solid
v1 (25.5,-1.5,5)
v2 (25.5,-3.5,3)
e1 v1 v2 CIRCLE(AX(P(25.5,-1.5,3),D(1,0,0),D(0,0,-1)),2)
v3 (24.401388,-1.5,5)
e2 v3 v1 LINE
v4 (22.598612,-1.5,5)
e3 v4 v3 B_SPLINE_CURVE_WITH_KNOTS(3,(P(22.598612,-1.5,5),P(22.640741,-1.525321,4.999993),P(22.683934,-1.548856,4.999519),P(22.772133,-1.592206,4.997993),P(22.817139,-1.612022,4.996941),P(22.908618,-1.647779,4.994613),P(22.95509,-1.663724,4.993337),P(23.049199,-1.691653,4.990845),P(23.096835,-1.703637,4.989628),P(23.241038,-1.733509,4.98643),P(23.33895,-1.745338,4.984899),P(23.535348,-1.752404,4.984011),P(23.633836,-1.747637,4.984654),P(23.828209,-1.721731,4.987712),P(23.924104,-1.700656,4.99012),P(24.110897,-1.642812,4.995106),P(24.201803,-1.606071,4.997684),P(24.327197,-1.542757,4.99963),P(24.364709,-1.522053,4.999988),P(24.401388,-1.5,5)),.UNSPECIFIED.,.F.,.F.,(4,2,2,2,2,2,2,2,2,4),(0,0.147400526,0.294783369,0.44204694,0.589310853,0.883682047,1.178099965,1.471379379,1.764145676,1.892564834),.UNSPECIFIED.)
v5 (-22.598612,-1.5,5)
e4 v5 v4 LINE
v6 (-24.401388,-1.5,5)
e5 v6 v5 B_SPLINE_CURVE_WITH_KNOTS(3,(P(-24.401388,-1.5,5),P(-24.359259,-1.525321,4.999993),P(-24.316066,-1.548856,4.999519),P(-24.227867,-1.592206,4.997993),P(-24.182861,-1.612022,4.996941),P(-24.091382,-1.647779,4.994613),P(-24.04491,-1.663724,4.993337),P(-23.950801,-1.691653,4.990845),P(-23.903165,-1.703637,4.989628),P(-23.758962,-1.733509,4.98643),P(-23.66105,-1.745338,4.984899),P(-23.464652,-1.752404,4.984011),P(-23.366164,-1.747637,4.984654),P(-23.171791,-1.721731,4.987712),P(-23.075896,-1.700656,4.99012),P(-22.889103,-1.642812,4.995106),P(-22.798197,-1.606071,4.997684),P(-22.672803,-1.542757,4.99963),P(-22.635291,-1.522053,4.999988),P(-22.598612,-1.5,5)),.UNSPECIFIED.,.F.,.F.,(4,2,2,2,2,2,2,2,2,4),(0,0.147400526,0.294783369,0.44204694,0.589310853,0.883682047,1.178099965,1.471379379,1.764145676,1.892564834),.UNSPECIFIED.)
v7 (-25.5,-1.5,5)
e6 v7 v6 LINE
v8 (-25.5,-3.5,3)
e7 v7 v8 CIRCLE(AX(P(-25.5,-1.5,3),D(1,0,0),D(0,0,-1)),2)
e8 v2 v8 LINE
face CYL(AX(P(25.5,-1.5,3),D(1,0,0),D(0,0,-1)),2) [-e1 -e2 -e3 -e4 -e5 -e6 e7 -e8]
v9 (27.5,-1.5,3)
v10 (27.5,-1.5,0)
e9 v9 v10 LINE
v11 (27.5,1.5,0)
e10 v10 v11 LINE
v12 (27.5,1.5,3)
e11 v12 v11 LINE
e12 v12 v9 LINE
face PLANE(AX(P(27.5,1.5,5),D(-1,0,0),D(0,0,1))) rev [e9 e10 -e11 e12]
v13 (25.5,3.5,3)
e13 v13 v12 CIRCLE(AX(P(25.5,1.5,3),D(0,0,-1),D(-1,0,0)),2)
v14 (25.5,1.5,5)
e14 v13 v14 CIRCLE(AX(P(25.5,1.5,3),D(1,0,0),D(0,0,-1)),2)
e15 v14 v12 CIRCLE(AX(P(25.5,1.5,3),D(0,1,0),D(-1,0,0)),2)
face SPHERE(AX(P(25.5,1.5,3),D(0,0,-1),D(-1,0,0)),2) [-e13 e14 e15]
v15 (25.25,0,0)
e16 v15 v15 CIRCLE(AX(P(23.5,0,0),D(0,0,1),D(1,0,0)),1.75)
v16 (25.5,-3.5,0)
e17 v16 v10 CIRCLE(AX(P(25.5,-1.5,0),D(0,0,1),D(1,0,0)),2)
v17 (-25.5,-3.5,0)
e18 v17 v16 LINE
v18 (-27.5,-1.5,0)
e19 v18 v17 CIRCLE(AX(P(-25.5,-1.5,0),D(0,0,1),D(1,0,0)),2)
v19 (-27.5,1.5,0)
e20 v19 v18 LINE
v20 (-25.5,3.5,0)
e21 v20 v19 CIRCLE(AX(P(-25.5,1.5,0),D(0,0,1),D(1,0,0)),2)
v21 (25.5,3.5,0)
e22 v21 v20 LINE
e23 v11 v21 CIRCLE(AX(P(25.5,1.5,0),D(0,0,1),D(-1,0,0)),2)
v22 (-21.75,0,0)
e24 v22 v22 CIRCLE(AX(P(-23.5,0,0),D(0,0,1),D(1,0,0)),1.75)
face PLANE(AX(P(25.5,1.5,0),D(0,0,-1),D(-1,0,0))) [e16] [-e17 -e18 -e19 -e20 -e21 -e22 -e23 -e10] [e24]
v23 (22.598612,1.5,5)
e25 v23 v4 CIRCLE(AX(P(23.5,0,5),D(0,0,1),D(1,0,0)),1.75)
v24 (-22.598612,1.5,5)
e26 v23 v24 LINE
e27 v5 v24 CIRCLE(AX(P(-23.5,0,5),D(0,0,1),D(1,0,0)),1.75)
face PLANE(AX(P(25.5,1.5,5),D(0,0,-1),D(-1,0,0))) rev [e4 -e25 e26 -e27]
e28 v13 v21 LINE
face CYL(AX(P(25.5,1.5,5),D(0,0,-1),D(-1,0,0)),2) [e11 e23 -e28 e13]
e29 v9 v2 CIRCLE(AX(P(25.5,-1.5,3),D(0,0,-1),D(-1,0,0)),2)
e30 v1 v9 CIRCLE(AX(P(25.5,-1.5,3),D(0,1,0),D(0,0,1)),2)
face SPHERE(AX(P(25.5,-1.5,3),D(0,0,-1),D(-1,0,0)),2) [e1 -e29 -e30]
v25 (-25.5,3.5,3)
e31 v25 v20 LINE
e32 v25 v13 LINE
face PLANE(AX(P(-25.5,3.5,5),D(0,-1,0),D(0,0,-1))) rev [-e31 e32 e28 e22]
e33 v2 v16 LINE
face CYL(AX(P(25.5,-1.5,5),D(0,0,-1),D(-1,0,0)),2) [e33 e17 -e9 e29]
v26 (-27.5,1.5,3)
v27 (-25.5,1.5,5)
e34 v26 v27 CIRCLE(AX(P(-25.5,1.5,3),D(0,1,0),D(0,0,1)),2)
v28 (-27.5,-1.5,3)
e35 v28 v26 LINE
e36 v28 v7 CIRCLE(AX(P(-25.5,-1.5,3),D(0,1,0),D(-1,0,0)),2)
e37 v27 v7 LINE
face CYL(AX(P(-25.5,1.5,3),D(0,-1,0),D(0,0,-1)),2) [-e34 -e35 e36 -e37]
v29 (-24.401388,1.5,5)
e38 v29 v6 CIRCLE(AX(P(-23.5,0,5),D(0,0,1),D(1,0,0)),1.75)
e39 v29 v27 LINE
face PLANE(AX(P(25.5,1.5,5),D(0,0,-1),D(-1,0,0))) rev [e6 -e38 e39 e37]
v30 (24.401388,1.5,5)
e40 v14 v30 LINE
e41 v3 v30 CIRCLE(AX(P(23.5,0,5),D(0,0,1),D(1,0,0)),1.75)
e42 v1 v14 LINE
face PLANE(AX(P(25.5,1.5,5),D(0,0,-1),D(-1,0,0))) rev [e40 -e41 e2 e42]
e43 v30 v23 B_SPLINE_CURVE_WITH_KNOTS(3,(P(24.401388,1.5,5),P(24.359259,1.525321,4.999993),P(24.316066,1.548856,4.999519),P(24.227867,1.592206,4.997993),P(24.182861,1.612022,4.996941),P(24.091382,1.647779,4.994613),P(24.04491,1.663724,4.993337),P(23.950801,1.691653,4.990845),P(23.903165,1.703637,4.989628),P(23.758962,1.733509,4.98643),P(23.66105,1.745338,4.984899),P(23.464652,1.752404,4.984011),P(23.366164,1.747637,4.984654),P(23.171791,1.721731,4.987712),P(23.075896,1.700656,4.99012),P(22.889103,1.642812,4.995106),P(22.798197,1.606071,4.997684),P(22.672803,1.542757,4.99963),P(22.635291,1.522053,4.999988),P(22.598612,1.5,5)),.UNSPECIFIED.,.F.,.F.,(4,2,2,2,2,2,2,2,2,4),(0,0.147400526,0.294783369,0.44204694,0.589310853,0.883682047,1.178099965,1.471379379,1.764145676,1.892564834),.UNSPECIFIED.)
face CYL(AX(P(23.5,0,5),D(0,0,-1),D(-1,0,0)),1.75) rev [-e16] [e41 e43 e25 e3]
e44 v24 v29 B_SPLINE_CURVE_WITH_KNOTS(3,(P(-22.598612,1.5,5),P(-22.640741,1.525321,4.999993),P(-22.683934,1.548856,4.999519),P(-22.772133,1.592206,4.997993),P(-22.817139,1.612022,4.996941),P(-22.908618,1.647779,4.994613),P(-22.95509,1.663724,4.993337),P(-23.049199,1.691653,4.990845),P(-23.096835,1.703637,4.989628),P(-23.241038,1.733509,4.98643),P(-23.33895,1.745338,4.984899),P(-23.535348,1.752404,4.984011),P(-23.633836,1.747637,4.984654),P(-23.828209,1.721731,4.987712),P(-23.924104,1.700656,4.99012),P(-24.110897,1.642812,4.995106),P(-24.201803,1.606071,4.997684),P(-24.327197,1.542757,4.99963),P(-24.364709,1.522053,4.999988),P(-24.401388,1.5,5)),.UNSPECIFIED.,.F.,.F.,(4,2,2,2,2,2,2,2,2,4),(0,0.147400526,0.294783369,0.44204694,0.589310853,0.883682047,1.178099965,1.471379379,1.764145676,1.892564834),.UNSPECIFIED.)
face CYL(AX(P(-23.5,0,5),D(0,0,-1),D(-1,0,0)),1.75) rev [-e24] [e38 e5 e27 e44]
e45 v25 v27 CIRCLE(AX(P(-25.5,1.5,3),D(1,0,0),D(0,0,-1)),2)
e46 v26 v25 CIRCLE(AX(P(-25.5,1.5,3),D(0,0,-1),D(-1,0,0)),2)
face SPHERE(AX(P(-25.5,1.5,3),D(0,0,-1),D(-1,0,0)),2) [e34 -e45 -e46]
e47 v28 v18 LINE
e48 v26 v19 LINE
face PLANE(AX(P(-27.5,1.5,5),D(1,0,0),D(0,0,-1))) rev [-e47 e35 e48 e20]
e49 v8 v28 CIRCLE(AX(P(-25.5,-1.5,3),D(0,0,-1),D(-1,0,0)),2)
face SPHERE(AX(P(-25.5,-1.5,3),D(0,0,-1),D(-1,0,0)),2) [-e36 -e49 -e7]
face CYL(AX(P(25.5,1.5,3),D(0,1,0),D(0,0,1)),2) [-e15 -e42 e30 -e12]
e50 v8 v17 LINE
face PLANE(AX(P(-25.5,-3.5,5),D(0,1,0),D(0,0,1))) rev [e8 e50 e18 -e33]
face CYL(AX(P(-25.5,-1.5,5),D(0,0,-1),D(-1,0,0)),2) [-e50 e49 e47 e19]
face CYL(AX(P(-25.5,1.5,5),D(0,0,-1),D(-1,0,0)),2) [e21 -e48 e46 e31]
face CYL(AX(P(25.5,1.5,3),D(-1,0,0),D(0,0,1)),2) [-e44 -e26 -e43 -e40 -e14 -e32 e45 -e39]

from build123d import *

# Parameters (mm, degrees)
SKETCH1_R           = 1.75
BOSS_EXTRUDE1_DEPTH = 5
FILLET1_R           = 2


with BuildPart() as part:
    # Sketch1 → Boss-Extrude1 (new body)
    with BuildSketch(Plane.XY):
        with BuildLine():
            Line((-25.5, 3.5), (25.5, 3.5))
            ThreePointArc((25.5, 3.5), (26.914213562, 2.914213562), (27.5, 1.5))
            Line((27.5, 1.5), (27.5, -1.5))
            ThreePointArc((27.5, -1.5), (26.914213562, -2.914213562), (25.5, -3.5))
            Line((25.5, -3.5), (-25.5, -3.5))
            ThreePointArc((-25.5, -3.5), (-26.914213562, -2.914213562), (-27.5, -1.5))
            Line((-27.5, -1.5), (-27.5, 1.5))
            ThreePointArc((-27.5, 1.5), (-26.914213562, 2.914213562), (-25.5, 3.5))
        make_face()
        with Locations((-23.5, 0)):
            Circle(SKETCH1_R, mode=Mode.SUBTRACT)
        with Locations((23.5, 0)):
            Circle(SKETCH1_R, mode=Mode.SUBTRACT)
    extrude(amount=BOSS_EXTRUDE1_DEPTH)

    # Fillet1
    # the kernel refuses this fillet: 2 mm, written as the material it takes off along each edge
    with BuildSketch(Plane(origin=(-25.5, 1.5, 5), x_dir=(-1, 0, 0), z_dir=(0, -1, 0))) as fillet1_piece_1:
        with BuildLine():
            CenterArc((2 - FILLET1_R, FILLET1_R), FILLET1_R, 270, 90)
            Line((2 - FILLET1_R, 0), (2, 0))
            Line((2, 0), (2, FILLET1_R))
        make_face()
    revolve(axis=Axis((-25.5, 1.5, 5), (0, 0, -1)), revolution_arc=90, mode=Mode.SUBTRACT)
    with BuildSketch(Plane(origin=(-27.5, -1.5, 5), x_dir=(0, 0, -1), z_dir=(0, 1, 0)), Plane(origin=(27.5, 1.5, 5), x_dir=(0, 0, -1), z_dir=(0, -1, 0))) as fillet1_piece_2:
        with BuildLine():
            CenterArc((FILLET1_R, -FILLET1_R), FILLET1_R, 90, 90)
            Line((0, -FILLET1_R), (0, 0))
            Line((0, 0), (FILLET1_R, 0))
        make_face()
    extrude(amount=3, mode=Mode.SUBTRACT)
    with BuildSketch(Plane(origin=(-25.5, -1.5, 5), x_dir=(0, -1, 0), z_dir=(1, 0, 0))) as fillet1_piece_3:
        with BuildLine():
            CenterArc((2 - FILLET1_R, FILLET1_R), FILLET1_R, 270, 90)
            Line((2 - FILLET1_R, 0), (2, 0))
            Line((2, 0), (2, FILLET1_R))
        make_face()
    revolve(axis=Axis((-25.5, -1.5, 5), (0, 0, -1)), revolution_arc=90, mode=Mode.SUBTRACT)
    with BuildSketch(Plane(origin=(25.5, -3.5, 5), x_dir=(0, 0, -1), z_dir=(-1, 0, 0)), Plane(origin=(-25.5, 3.5, 5), x_dir=(0, 0, -1), z_dir=(1, 0, 0))) as fillet1_piece_4:
        with BuildLine():
            CenterArc((FILLET1_R, -FILLET1_R), FILLET1_R, 90, 90)
            Line((0, -FILLET1_R), (0, 0))
            Line((0, 0), (FILLET1_R, 0))
        make_face()
    extrude(amount=51, mode=Mode.SUBTRACT)
    with BuildSketch(Plane(origin=(25.5, -1.5, 5), x_dir=(1, 0, 0), z_dir=(0, 1, 0))) as fillet1_piece_5:
        with BuildLine():
            CenterArc((2 - FILLET1_R, FILLET1_R), FILLET1_R, 270, 90)
            Line((2 - FILLET1_R, 0), (2, 0))
            Line((2, 0), (2, FILLET1_R))
        make_face()
    revolve(axis=Axis((25.5, -1.5, 5), (0, 0, -1)), revolution_arc=90, mode=Mode.SUBTRACT)
    with BuildSketch(Plane(origin=(25.5, 1.5, 5), x_dir=(0, 1, 0), z_dir=(-1, 0, 0))) as fillet1_piece_6:
        with BuildLine():
            CenterArc((2 - FILLET1_R, FILLET1_R), FILLET1_R, 270, 90)
            Line((2 - FILLET1_R, 0), (2, 0))
            Line((2, 0), (2, FILLET1_R))
        make_face()
    revolve(axis=Axis((25.5, 1.5, 5), (0, 0, -1)), revolution_arc=90, mode=Mode.SUBTRACT)


solid = part.part
